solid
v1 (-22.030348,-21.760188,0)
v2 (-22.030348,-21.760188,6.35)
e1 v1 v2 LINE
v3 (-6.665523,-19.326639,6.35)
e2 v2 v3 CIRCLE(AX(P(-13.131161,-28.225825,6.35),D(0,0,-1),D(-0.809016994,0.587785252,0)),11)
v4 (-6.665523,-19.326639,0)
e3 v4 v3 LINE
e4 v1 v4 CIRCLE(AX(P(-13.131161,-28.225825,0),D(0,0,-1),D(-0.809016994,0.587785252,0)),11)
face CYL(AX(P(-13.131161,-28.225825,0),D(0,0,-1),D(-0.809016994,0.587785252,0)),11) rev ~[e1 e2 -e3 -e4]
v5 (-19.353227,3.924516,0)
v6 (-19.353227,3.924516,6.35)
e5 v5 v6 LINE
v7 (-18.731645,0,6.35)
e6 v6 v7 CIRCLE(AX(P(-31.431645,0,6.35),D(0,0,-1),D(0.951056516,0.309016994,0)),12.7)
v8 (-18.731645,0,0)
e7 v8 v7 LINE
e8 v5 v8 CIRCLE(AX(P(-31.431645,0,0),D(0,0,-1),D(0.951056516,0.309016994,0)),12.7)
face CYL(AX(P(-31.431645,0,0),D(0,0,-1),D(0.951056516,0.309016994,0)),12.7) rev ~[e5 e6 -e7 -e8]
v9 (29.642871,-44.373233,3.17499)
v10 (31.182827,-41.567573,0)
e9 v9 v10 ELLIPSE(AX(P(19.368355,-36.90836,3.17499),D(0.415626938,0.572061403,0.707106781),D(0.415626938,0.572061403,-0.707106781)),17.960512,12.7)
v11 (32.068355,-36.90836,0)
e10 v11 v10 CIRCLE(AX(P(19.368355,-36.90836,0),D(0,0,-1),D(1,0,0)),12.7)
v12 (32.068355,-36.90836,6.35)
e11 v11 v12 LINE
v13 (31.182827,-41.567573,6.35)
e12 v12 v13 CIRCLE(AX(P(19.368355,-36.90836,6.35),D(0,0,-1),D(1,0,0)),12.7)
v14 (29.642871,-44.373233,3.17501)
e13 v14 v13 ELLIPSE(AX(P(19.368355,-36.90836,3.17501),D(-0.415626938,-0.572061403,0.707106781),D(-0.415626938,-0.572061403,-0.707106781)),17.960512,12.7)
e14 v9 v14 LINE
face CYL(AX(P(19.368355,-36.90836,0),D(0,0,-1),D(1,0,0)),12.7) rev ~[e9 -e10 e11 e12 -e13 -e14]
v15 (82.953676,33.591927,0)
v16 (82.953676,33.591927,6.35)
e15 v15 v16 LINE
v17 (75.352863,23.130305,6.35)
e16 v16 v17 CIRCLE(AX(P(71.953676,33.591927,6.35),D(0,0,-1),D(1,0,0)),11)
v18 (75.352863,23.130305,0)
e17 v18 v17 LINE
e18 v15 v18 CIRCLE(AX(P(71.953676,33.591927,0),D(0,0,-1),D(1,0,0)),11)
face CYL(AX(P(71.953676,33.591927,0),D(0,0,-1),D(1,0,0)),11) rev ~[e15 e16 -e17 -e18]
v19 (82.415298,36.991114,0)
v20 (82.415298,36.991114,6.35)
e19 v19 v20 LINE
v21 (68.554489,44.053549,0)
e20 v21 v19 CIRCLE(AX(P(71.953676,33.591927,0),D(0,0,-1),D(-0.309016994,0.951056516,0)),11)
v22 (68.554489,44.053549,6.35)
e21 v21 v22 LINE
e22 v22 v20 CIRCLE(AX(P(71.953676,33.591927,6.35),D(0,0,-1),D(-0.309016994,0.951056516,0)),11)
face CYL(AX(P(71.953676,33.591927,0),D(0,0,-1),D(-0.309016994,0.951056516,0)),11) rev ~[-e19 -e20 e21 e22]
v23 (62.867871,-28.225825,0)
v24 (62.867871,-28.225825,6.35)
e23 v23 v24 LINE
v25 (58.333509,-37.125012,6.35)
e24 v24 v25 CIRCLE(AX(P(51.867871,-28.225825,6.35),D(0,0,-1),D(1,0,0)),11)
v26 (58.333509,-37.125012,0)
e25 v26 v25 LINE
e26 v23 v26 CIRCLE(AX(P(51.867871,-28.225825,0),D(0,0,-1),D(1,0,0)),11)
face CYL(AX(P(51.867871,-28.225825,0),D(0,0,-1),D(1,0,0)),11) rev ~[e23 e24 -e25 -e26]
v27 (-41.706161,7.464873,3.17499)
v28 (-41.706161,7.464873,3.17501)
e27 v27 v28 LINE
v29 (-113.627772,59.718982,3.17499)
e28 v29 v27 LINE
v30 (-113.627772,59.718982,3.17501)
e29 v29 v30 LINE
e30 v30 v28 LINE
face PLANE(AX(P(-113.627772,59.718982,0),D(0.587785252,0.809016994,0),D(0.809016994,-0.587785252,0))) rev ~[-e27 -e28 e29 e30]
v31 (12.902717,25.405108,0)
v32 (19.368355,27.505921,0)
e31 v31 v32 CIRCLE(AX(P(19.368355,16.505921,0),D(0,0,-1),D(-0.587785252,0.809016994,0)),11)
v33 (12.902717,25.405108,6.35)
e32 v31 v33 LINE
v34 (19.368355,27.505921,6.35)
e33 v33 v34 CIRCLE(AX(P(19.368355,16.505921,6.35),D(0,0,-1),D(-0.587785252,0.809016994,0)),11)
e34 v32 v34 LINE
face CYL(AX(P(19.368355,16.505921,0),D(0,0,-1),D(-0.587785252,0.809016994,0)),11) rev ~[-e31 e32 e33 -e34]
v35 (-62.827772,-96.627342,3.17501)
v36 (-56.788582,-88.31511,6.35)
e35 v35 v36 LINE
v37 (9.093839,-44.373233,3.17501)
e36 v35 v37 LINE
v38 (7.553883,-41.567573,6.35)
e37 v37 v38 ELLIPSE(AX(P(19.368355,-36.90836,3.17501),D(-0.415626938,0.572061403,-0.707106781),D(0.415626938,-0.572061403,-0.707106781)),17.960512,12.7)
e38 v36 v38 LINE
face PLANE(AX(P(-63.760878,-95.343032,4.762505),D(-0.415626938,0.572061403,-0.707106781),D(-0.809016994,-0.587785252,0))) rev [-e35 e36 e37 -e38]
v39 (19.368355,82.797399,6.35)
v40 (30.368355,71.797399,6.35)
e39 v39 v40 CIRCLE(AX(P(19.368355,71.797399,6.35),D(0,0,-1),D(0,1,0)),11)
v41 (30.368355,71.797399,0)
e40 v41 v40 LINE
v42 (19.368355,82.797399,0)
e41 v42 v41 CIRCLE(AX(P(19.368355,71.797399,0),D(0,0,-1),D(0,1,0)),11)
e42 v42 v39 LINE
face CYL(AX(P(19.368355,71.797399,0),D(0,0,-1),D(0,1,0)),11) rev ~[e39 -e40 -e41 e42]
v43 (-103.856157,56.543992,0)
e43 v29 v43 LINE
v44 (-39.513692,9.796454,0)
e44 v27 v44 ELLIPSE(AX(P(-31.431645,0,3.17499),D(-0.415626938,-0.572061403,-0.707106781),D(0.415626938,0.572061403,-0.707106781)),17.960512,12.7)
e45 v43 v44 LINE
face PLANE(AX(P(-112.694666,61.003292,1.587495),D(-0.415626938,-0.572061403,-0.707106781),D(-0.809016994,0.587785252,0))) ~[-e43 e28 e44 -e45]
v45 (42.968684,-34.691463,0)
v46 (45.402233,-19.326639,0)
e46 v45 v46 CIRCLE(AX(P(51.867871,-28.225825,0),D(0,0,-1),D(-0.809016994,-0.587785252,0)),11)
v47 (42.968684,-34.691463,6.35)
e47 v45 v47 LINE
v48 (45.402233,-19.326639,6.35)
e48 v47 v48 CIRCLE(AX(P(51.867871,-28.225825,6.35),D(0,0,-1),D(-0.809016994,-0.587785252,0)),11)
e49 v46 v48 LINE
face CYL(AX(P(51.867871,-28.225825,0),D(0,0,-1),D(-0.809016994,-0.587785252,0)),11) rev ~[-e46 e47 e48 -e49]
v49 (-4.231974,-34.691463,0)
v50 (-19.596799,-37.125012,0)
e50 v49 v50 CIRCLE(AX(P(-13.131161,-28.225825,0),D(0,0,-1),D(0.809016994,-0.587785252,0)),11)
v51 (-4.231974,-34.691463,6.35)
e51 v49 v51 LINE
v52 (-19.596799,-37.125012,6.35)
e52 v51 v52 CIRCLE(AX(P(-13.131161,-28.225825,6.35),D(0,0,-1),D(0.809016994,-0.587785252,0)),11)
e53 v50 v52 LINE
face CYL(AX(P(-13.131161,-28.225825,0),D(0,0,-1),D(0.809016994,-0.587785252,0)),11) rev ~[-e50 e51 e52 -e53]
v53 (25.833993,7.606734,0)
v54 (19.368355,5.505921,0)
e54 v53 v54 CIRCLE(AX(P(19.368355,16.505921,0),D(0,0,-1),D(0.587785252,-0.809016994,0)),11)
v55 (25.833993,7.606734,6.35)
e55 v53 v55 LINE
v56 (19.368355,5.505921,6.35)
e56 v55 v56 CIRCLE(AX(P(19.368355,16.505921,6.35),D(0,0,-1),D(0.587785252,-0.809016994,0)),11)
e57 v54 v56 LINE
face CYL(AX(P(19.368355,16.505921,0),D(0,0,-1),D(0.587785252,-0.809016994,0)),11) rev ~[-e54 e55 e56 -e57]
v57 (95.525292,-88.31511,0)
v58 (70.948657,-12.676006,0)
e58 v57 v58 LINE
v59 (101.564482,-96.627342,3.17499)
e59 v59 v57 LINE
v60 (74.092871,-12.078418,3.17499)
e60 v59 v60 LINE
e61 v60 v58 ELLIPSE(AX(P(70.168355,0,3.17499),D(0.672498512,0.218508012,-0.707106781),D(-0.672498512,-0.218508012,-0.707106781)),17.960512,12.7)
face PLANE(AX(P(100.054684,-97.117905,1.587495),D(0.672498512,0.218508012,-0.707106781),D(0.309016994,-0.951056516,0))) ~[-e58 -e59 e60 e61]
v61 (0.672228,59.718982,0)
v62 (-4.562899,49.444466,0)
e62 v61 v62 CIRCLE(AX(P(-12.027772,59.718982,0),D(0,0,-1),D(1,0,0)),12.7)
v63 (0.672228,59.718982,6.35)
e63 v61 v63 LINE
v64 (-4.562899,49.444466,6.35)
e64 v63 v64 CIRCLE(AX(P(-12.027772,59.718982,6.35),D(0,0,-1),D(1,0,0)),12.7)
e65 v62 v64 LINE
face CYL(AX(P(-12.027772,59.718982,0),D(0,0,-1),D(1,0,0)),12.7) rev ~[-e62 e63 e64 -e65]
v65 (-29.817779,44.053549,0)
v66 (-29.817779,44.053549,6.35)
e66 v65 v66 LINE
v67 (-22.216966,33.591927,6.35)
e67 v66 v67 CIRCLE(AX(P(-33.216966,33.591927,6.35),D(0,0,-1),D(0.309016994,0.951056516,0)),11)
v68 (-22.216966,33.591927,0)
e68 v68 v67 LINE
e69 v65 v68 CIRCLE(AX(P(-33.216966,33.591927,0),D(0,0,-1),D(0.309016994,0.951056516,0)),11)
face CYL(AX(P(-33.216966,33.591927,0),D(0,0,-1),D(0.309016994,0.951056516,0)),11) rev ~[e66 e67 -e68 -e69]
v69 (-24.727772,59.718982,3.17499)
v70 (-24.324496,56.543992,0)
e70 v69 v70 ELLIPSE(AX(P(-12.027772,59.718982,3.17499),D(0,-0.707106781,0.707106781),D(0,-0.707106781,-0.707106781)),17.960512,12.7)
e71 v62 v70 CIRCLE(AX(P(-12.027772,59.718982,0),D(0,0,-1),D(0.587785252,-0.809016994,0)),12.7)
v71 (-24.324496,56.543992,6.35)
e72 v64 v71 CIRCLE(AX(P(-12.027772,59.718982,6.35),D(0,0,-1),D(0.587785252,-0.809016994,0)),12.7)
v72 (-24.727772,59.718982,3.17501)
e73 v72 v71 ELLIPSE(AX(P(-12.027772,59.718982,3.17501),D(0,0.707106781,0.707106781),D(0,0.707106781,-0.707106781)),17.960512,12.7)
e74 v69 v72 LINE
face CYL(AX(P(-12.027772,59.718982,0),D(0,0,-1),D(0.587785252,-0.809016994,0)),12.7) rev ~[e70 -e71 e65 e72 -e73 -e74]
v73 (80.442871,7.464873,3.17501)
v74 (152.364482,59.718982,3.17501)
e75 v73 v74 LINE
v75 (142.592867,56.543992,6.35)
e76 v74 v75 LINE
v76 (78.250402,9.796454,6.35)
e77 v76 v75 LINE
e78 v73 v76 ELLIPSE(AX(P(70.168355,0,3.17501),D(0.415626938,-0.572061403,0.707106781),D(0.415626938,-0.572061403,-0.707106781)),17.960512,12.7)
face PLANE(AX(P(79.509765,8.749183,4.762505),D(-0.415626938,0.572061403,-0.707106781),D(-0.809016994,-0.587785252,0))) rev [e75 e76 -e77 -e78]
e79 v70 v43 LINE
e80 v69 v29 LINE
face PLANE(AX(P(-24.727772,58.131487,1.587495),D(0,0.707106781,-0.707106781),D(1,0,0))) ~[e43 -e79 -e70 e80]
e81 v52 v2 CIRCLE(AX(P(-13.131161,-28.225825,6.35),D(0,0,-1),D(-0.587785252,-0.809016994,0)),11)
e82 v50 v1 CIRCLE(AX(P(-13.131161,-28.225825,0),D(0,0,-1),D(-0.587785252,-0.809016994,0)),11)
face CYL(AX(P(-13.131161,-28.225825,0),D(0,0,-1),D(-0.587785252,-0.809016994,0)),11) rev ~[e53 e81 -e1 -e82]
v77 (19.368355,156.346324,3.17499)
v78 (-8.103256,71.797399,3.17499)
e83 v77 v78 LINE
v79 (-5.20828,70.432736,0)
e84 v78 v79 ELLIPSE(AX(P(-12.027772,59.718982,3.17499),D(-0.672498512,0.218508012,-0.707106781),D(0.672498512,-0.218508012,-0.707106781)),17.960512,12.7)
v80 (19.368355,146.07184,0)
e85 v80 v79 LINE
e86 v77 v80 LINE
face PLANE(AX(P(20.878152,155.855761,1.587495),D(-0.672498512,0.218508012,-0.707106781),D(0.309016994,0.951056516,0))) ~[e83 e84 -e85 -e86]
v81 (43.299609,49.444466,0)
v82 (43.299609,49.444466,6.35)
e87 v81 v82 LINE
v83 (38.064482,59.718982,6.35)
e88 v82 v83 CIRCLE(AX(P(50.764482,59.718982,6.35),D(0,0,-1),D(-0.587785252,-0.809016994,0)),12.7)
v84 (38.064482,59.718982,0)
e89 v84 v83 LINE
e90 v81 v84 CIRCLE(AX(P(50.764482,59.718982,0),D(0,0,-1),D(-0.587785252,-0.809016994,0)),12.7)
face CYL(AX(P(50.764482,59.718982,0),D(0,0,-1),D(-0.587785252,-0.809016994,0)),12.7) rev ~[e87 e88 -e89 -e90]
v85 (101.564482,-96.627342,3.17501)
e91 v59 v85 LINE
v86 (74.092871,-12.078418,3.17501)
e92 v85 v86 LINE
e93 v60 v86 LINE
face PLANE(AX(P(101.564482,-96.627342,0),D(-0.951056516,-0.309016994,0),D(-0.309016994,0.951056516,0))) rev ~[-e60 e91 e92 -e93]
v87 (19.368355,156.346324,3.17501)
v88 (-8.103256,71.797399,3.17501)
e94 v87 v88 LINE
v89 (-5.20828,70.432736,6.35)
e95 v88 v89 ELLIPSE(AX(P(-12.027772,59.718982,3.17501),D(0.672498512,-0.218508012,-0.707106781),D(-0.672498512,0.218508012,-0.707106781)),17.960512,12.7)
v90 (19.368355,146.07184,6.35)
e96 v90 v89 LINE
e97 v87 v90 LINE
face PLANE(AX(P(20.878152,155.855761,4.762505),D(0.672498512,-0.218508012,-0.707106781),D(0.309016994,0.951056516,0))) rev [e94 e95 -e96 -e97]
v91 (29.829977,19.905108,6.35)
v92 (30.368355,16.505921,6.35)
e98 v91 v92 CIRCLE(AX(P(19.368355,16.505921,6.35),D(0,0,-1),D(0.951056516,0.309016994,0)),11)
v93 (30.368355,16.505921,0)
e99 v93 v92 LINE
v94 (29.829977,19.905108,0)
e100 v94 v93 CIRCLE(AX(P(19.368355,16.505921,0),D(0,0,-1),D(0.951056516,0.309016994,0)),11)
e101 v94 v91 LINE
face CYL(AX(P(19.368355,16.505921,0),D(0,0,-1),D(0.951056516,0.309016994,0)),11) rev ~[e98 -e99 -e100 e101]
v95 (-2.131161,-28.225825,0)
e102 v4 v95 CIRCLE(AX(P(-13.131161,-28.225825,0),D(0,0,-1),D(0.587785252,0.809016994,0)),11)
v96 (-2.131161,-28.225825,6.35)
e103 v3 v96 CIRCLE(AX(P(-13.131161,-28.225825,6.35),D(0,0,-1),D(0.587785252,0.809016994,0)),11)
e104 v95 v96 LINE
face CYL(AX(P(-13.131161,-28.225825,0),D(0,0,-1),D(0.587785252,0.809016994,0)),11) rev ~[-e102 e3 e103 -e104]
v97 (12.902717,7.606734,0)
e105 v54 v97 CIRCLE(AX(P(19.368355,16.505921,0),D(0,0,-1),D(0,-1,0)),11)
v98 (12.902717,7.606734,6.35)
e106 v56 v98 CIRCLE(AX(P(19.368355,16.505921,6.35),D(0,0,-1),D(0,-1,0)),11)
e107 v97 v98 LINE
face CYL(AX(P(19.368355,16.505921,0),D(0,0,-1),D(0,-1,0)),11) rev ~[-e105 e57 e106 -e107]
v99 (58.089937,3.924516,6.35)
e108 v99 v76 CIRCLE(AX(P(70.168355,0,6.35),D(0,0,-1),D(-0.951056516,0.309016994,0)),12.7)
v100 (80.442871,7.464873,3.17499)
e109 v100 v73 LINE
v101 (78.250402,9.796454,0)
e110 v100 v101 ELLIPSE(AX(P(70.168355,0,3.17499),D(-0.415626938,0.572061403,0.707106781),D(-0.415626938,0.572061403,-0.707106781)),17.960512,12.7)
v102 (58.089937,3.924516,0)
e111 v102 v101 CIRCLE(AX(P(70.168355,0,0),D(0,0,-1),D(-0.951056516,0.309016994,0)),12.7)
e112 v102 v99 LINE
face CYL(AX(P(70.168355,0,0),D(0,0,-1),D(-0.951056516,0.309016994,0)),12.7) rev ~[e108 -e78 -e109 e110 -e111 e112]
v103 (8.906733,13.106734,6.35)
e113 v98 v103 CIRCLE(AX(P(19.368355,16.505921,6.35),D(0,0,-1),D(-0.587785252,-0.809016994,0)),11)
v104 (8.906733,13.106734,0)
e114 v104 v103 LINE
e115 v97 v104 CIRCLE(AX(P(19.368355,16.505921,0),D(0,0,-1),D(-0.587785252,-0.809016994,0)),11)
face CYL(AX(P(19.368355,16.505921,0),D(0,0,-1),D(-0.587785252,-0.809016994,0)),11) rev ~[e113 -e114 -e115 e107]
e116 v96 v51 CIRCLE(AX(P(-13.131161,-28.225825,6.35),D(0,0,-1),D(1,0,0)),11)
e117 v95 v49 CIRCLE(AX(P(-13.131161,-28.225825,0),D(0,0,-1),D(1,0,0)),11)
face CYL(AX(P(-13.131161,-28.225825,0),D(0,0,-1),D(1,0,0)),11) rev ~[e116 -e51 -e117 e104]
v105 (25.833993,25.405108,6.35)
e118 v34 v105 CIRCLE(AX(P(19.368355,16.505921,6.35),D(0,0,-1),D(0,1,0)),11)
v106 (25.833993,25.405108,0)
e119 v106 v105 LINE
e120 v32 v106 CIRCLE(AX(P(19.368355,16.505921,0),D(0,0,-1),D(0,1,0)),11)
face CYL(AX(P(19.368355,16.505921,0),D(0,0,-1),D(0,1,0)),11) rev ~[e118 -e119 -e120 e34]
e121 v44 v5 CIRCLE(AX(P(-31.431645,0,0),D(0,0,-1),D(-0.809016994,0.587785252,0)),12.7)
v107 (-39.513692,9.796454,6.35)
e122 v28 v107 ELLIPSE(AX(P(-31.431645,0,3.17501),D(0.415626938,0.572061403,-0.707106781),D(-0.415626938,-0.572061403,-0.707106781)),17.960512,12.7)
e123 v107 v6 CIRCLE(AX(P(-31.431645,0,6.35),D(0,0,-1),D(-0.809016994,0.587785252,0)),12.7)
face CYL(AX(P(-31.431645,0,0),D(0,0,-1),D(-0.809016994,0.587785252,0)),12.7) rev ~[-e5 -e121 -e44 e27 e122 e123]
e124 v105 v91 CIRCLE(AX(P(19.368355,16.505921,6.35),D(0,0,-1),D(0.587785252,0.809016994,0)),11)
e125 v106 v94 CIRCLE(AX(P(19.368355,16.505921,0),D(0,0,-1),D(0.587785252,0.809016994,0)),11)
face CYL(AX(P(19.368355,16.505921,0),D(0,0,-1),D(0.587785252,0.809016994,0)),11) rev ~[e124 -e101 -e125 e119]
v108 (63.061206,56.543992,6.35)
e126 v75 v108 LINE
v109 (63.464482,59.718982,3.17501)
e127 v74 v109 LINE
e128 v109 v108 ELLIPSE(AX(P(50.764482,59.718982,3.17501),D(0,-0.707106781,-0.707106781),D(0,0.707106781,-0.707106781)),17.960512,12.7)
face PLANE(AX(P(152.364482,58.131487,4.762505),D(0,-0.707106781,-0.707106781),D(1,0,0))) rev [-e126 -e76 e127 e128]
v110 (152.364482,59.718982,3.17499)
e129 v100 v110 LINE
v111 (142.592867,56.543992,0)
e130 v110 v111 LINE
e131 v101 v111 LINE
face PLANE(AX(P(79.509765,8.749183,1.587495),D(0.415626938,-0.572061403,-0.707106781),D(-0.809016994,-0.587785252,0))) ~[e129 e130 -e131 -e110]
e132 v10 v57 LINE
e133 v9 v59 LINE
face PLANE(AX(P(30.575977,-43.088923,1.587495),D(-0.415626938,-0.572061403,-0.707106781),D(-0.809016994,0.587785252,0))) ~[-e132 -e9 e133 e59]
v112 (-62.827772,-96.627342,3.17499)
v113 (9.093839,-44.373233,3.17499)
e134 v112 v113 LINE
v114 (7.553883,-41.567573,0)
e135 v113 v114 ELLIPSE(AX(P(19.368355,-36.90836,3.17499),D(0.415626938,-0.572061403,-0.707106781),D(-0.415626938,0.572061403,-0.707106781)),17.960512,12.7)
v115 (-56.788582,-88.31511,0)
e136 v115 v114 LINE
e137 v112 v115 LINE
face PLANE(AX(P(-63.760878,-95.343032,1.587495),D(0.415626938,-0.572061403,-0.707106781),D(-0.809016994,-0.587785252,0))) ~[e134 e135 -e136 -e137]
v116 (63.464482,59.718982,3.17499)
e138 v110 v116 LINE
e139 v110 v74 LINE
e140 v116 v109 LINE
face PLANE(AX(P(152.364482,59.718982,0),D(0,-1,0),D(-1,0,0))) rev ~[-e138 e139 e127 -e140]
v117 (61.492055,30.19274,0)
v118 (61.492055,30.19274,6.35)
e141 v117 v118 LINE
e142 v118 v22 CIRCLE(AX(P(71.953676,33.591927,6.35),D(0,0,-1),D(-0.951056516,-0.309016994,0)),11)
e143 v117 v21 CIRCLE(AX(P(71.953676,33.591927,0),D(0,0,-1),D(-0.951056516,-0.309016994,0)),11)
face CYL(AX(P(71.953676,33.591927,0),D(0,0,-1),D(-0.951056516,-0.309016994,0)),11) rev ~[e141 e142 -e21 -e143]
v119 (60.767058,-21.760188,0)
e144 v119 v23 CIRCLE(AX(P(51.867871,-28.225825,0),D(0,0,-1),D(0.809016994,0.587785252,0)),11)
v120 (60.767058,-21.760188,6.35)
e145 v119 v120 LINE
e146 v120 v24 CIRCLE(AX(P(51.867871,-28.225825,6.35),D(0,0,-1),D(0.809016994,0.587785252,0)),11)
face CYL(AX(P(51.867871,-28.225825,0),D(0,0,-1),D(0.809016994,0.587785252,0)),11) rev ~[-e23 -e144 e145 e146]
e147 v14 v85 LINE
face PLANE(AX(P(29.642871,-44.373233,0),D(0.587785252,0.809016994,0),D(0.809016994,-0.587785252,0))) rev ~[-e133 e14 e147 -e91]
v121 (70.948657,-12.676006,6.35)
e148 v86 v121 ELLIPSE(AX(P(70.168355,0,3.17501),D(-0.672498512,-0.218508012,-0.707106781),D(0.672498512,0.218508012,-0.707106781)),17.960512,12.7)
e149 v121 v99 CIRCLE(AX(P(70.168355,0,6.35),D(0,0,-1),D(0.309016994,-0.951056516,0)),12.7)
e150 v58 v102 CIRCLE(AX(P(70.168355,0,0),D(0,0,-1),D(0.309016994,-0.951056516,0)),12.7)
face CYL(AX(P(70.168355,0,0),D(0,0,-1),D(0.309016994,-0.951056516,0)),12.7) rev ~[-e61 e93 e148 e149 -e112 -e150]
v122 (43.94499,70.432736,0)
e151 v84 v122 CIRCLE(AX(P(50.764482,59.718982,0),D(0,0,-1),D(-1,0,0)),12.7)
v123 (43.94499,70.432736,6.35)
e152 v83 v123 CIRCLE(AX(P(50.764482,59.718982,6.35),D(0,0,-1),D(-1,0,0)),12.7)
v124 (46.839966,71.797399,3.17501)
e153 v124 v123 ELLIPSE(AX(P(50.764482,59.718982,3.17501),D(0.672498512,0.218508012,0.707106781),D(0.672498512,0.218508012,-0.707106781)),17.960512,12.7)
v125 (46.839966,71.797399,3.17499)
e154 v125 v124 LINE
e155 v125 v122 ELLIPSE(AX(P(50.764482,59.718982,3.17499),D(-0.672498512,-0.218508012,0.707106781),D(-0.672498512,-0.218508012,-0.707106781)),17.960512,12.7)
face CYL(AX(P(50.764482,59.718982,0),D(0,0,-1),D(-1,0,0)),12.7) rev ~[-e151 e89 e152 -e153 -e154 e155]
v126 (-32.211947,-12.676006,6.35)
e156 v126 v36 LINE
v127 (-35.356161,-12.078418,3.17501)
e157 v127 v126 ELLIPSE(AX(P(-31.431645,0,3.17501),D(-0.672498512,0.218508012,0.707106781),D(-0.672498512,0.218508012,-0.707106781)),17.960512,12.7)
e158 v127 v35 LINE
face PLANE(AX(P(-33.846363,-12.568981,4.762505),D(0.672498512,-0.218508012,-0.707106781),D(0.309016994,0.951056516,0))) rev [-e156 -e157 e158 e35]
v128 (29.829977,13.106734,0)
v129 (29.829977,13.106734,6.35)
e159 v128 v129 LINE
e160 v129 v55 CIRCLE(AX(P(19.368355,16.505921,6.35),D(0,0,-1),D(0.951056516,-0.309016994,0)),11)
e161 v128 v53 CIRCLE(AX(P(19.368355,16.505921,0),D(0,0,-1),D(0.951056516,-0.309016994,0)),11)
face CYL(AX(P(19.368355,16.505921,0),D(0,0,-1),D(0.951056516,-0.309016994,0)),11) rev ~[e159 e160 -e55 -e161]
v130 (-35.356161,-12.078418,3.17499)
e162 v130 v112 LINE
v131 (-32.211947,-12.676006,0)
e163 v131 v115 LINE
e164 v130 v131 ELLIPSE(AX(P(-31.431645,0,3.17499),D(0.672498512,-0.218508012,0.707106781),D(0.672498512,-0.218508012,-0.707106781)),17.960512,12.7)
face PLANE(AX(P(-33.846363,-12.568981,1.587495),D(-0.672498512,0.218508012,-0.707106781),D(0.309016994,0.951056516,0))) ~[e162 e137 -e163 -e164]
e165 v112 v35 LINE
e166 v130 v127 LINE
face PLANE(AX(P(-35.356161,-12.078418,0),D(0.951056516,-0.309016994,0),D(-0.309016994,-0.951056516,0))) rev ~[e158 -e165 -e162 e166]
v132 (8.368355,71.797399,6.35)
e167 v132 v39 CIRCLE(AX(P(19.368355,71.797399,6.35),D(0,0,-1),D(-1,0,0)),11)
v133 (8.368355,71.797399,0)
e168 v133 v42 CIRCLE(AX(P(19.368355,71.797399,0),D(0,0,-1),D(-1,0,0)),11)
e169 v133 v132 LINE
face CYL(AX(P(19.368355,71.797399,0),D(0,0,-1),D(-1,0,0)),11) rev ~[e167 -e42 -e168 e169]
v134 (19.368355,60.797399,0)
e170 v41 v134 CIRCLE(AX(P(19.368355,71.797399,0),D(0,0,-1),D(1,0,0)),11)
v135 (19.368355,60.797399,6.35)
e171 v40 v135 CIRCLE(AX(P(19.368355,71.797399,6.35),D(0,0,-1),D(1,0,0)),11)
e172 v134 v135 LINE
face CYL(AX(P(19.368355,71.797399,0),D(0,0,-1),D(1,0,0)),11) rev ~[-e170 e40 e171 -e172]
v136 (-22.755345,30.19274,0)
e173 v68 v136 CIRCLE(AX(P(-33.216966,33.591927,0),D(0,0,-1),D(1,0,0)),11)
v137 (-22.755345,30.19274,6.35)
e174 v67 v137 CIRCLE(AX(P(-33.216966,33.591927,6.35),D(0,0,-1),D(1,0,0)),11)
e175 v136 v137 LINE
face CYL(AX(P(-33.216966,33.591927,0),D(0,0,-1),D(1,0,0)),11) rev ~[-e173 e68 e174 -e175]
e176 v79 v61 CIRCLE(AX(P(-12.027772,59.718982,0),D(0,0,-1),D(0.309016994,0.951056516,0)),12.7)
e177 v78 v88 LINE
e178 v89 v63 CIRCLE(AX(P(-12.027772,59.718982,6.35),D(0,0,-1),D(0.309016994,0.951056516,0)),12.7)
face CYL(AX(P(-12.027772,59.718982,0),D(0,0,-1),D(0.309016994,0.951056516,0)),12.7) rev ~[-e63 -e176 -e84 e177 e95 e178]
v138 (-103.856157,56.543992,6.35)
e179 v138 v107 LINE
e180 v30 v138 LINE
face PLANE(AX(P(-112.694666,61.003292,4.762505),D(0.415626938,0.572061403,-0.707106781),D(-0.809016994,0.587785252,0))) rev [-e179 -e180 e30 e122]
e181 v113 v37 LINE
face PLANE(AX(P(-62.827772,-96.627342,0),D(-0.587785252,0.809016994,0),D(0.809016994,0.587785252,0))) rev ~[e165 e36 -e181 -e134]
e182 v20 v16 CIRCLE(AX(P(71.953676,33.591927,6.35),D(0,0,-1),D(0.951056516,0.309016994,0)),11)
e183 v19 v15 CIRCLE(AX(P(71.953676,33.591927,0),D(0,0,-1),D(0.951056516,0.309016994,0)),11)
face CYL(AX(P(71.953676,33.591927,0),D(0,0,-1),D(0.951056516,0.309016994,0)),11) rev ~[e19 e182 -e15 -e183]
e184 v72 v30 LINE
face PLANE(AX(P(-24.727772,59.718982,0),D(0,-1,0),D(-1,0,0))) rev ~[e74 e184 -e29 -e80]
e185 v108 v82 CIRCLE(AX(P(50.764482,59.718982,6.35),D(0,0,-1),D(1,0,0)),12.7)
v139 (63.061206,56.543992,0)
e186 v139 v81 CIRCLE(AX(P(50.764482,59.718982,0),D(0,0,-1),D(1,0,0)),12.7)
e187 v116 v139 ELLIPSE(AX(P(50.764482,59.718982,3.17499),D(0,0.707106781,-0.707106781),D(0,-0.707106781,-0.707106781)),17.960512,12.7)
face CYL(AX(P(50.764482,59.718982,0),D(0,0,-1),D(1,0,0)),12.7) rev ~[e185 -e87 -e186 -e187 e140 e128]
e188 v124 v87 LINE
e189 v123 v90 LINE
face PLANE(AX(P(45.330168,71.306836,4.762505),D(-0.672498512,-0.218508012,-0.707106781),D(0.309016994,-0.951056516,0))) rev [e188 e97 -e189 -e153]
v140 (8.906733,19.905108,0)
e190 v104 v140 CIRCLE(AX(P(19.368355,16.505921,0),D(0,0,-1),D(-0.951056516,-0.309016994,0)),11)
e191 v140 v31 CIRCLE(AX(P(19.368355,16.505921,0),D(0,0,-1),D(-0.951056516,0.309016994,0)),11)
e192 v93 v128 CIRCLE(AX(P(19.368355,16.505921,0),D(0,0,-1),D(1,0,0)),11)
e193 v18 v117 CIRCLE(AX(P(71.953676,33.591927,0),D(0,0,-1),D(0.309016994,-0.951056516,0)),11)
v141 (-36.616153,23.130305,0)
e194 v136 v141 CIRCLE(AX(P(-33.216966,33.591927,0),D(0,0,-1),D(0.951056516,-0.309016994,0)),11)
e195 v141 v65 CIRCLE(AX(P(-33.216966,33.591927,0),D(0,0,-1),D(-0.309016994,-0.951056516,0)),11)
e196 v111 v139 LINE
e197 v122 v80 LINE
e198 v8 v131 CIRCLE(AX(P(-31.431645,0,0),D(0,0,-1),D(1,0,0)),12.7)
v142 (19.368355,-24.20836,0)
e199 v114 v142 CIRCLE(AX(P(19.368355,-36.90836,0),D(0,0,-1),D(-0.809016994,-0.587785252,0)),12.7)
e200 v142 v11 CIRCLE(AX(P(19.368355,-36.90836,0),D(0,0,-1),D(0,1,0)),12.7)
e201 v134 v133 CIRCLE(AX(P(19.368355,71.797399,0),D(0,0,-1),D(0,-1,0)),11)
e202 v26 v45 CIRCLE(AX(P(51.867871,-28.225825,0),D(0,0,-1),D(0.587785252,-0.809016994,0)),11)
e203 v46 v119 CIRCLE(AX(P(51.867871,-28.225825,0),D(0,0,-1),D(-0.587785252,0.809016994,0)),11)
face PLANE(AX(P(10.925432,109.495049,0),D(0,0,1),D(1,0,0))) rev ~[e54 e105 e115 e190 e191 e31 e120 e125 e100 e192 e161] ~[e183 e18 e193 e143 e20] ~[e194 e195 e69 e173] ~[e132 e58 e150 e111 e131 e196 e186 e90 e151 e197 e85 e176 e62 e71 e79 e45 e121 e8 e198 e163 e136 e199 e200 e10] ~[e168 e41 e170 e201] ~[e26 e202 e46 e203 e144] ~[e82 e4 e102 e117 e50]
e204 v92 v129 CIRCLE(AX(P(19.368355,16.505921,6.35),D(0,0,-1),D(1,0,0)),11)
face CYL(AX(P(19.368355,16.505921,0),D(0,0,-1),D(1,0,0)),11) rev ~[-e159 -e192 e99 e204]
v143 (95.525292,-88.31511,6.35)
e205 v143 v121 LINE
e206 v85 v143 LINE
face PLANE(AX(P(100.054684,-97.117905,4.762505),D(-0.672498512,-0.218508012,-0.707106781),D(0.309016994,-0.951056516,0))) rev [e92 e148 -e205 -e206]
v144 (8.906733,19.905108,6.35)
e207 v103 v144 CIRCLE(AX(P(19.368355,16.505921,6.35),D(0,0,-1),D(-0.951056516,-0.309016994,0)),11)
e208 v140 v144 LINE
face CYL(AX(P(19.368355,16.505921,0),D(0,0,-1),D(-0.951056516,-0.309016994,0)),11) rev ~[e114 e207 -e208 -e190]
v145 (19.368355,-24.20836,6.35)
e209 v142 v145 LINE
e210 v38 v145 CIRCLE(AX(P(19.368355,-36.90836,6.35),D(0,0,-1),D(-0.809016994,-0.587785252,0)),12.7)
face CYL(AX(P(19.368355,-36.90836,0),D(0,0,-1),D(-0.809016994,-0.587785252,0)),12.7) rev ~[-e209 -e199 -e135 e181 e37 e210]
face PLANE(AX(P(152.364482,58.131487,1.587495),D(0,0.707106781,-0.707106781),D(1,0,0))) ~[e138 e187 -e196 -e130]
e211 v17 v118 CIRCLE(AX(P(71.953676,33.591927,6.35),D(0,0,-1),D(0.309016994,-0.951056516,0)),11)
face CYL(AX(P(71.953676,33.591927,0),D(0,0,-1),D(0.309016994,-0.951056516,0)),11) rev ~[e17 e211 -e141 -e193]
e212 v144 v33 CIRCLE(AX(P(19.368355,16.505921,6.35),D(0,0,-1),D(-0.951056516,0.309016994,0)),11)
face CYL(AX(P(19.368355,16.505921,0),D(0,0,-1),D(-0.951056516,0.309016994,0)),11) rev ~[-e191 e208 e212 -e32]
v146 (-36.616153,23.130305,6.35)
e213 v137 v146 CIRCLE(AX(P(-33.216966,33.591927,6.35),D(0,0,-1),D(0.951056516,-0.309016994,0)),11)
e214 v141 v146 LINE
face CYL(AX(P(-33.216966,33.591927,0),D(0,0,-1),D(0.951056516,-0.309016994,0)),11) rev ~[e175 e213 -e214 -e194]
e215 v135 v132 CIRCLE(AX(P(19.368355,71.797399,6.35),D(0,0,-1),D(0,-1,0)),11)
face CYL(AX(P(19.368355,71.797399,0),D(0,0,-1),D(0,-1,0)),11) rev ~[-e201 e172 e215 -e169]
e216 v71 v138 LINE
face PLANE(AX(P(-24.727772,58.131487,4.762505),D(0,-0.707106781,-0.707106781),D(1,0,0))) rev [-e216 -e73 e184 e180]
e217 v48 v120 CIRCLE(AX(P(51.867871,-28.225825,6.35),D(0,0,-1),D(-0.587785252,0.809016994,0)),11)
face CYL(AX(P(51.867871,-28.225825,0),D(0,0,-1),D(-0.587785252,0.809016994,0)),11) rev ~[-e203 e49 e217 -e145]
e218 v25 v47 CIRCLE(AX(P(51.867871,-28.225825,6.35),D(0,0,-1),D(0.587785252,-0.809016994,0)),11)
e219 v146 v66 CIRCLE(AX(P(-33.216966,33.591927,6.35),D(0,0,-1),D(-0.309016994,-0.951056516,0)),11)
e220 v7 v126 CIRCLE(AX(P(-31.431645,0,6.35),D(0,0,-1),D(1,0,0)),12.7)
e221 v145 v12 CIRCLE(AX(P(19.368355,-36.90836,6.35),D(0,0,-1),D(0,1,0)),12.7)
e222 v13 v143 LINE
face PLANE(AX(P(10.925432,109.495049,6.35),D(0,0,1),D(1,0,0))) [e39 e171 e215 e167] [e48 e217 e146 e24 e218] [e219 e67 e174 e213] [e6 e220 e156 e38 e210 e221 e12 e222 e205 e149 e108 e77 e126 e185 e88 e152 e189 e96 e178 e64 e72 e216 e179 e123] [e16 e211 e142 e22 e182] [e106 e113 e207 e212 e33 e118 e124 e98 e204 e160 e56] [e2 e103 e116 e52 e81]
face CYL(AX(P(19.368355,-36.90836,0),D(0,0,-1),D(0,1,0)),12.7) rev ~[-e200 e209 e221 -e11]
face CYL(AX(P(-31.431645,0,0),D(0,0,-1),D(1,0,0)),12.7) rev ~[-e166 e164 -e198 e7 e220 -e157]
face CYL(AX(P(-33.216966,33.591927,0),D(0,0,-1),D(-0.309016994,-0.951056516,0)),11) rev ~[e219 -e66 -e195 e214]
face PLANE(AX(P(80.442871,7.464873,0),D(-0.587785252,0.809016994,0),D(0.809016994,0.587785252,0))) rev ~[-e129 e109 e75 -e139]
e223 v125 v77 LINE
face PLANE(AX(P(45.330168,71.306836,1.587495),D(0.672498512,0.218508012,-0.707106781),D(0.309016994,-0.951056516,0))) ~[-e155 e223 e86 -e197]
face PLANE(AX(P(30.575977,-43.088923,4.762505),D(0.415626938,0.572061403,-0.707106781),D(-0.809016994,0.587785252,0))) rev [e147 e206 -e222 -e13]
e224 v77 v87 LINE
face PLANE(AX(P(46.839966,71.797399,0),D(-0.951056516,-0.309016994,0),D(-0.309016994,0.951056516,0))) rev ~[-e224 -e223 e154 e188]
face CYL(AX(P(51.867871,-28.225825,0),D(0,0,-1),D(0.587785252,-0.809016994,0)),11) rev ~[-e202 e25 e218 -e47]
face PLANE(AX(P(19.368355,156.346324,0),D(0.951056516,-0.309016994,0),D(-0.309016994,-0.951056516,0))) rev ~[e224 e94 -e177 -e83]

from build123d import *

# Parameters (mm, degrees)
F1_DEPTH = 6.35
F2_SIZE  = 3.17499


# Not quite as in the source:
# - a fillet or chamfer is up to 0.001 mm smaller than in the source, because OpenCascade refuses the exact size
# - a feature names something its author has since deleted; it is built from what else it names


with BuildPart() as f1:
    # F0 (on Top) → F1 (new body)
    with BuildSketch(Plane.XY):
        with BuildLine():
            Line((19.3683549781, 156.3463236885), (-8.1032558219, 71.7973993899))
            Line((-8.1032558219, 71.7973993899), (8.3683549781, 71.7973993899))
            ThreePointArc((8.3683549781, 71.7973993899), (11.590180385, 79.5755739829), (19.3683549781, 82.7973993899))
            Line((19.3683549781, 82.7973993899), (19.3683549781, 156.3463236885))
        make_face()
        with BuildLine():
            Line((19.3683549781, 60.7973993899), (19.3683549781, 59.7189816329))
            Line((19.3683549781, 59.7189816329), (38.0644816066, 59.7189816329))
            ThreePointArc((38.0644816066, 59.7189816329), (40.489965778, 67.183854337), (46.839965778, 71.7973993899))
            Line((46.839965778, 71.7973993899), (30.3683549781, 71.7973993899))
            ThreePointArc((30.3683549781, 71.7973993899), (27.1465295711, 64.0192247968), (19.3683549781, 60.7973993899))
        make_face()
        with BuildLine():
            Line((19.3683549781, 59.7189816329), (0.6722283496, 59.7189816329))
            ThreePointArc((0.6722283496, 59.7189816329), (-0.7119887932, 53.9533022862), (-4.5628989463, 49.4444658044))
            Line((-4.5628989463, 49.4444658044), (12.9027172029, 25.4051075068))
            ThreePointArc((12.9027172029, 25.4051075068), (15.96916804, 26.9675422479), (19.3683549781, 27.5059205686))
            Line((19.3683549781, 27.5059205686), (19.3683549781, 59.7189816329))
        make_face()
        with BuildLine():
            ThreePointArc((-4.5628989463, 49.4444658044), (-17.7934509971, 48.4031987757), (-24.7277716504, 59.7189816329))
            Line((-24.7277716504, 59.7189816329), (-29.8177793123, 44.0535488478))
            ThreePointArc((-29.8177793123, 44.0535488478), (-24.3177793123, 40.0575649437), (-22.2169662504, 33.5919271685))
            ThreePointArc((-22.2169662504, 33.5919271685), (-22.3523945039, 31.8711480531), (-22.7553445712, 30.1927402304))
            Line((-22.7553445712, 30.1927402304), (8.9067332988, 19.9051075068))
            ThreePointArc((8.9067332988, 19.9051075068), (10.46916804, 22.9715583438), (12.9027172029, 25.4051075068))
            Line((12.9027172029, 25.4051075068), (-4.5628989463, 49.4444658044))
        make_face()
        with BuildLine():
            Line((-36.6161531886, 23.1303054893), (-41.7061608505, 7.4648727041))
            ThreePointArc((-41.7061608505, 7.4648727041), (-29.4449273159, 12.5436419256), (-19.353227265, 3.9245158286))
            Line((-19.353227265, 3.9245158286), (8.9067332988, 13.1067336305))
            ThreePointArc((8.9067332988, 13.1067336305), (8.3683549781, 16.5059205686), (8.9067332988, 19.9051075068))
            Line((8.9067332988, 19.9051075068), (-22.7553445712, 30.1927402304))
            ThreePointArc((-22.7553445712, 30.1927402304), (-28.2230707533, 23.7908554024), (-36.6161531886, 23.1303054893))
        make_face()
        with BuildLine():
            ThreePointArc((-18.7316450219, 0), (-23.9667723178, -10.2745158286), (-35.3561608505, -12.0784177569))
            Line((-35.3561608505, -12.0784177569), (-22.0303477886, -21.7601876667))
            ThreePointArc((-22.0303477886, -21.7601876667), (-14.8519399659, -17.3612536953), (-6.6655230753, -19.3266385037))
            Line((-6.6655230753, -19.3266385037), (12.9027172029, 7.6067336305))
            ThreePointArc((12.9027172029, 7.6067336305), (10.46916804, 10.0402827934), (8.9067332988, 13.1067336305))
            Line((8.9067332988, 13.1067336305), (-19.353227265, 3.9245158286))
            ThreePointArc((-19.353227265, 3.9245158286), (-18.8880030964, 1.986717706), (-18.7316450219, 0))
        make_face()
        with BuildLine():
            ThreePointArc((19.3683549781, 5.5059205686), (15.96916804, 6.0442988894), (12.9027172029, 7.6067336305))
            Line((12.9027172029, 7.6067336305), (-6.6655230753, -19.3266385037))
            ThreePointArc((-6.6655230753, -19.3266385037), (-3.3300890844, -23.2319299447), (-2.1311608505, -28.2258254419))
            ThreePointArc((-2.1311608505, -28.2258254419), (-2.6695391712, -31.62501238), (-4.2319739124, -34.6914632171))
            Line((-4.2319739124, -34.6914632171), (9.0938391495, -44.3732331268))
            ThreePointArc((9.0938391495, -44.3732331268), (8.0525721209, -31.142681076), (19.3683549781, -24.2083604227))
            Line((19.3683549781, -24.2083604227), (19.3683549781, 5.5059205686))
        make_face()
        with BuildLine():
            Line((45.4022330314, -19.3266385037), (25.8339927533, 7.6067336305))
            ThreePointArc((25.8339927533, 7.6067336305), (22.7675419162, 6.0442988894), (19.3683549781, 5.5059205686))
            Line((19.3683549781, 5.5059205686), (19.3683549781, -24.2083604227))
            ThreePointArc((19.3683549781, -24.2083604227), (28.3486110991, -27.9281043016), (32.0683549781, -36.9083604227))
            ThreePointArc((32.0683549781, -36.9083604227), (31.446772735, -40.8328762512), (29.6428708066, -44.3732331268))
            Line((29.6428708066, -44.3732331268), (42.9686838685, -34.6914632171))
            ThreePointArc((42.9686838685, -34.6914632171), (41.0032990601, -26.5050463264), (45.4022330314, -19.3266385037))
        make_face()
        with BuildLine():
            ThreePointArc((29.8299766573, 13.1067336305), (28.2675419162, 10.0402827934), (25.8339927533, 7.6067336305))
            Line((25.8339927533, 7.6067336305), (45.4022330314, -19.3266385037))
            ThreePointArc((45.4022330314, -19.3266385037), (53.5886499221, -17.3612536953), (60.7670577448, -21.7601876667))
            Line((60.7670577448, -21.7601876667), (74.0928708066, -12.0784177569))
            ThreePointArc((74.0928708066, -12.0784177569), (61.188098857, -8.9802561211), (58.0899372211, 3.9245158286))
            Line((58.0899372211, 3.9245158286), (29.8299766573, 13.1067336305))
        make_face()
        with BuildLine():
            Line((61.4920545274, 30.1927402304), (29.8299766573, 19.9051075068))
            ThreePointArc((29.8299766573, 19.9051075068), (30.2329267246, 18.2266996841), (30.3683549781, 16.5059205686))
            ThreePointArc((30.3683549781, 16.5059205686), (30.2329267246, 14.7851414532), (29.8299766573, 13.1067336305))
            Line((29.8299766573, 13.1067336305), (58.0899372211, 3.9245158286))
            ThreePointArc((58.0899372211, 3.9245158286), (68.1816372721, 12.5436419256), (80.4428708066, 7.4648727041))
            Line((80.4428708066, 7.4648727041), (75.3528631447, 23.1303054893))
            ThreePointArc((75.3528631447, 23.1303054893), (66.9597807095, 23.7908554024), (61.4920545274, 30.1927402304))
        make_face()
        with BuildLine():
            Line((68.5544892685, 44.0535488478), (63.4644816066, 59.7189816329))
            ThreePointArc((63.4644816066, 59.7189816329), (56.5301609533, 48.4031987757), (43.2996089025, 49.4444658044))
            Line((43.2996089025, 49.4444658044), (25.8339927533, 25.4051075068))
            ThreePointArc((25.8339927533, 25.4051075068), (28.2675419162, 22.9715583438), (29.8299766573, 19.9051075068))
            Line((29.8299766573, 19.9051075068), (61.4920545274, 30.1927402304))
            ThreePointArc((61.4920545274, 30.1927402304), (62.1526044405, 38.5858226656), (68.5544892685, 44.0535488478))
        make_face()
        with BuildLine():
            Line((8.3683549781, 71.7973993899), (-8.1032558219, 71.7973993899))
            ThreePointArc((-8.1032558219, 71.7973993899), (-1.7532558219, 67.183854337), (0.6722283496, 59.7189816329))
            Line((0.6722283496, 59.7189816329), (19.3683549781, 59.7189816329))
            Line((19.3683549781, 59.7189816329), (19.3683549781, 60.7973993899))
            ThreePointArc((19.3683549781, 60.7973993899), (11.590180385, 64.0192247968), (8.3683549781, 71.7973993899))
        make_face()
        with BuildLine():
            Line((46.839965778, 71.7973993899), (19.3683549781, 156.3463236885))
            Line((19.3683549781, 156.3463236885), (19.3683549781, 82.7973993899))
            ThreePointArc((19.3683549781, 82.7973993899), (27.1465295711, 79.5755739829), (30.3683549781, 71.7973993899))
            Line((30.3683549781, 71.7973993899), (46.839965778, 71.7973993899))
        make_face()
        with BuildLine():
            Line((38.0644816066, 59.7189816329), (19.3683549781, 59.7189816329))
            Line((19.3683549781, 59.7189816329), (19.3683549781, 27.5059205686))
            ThreePointArc((19.3683549781, 27.5059205686), (22.7675419162, 26.9675422479), (25.8339927533, 25.4051075068))
            Line((25.8339927533, 25.4051075068), (43.2996089025, 49.4444658044))
            ThreePointArc((43.2996089025, 49.4444658044), (39.4486987494, 53.9533022862), (38.0644816066, 59.7189816329))
        make_face()
        with BuildLine():
            Line((-29.8177793123, 44.0535488478), (-24.7277716504, 59.7189816329))
            Line((-24.7277716504, 59.7189816329), (-113.6277716504, 59.7189816329))
            Line((-113.6277716504, 59.7189816329), (-43.6785879297, 36.9911141066))
            ThreePointArc((-43.6785879297, 36.9911141066), (-38.2108617476, 43.3929989346), (-29.8177793123, 44.0535488478))
        make_face()
        with BuildLine():
            Line((-43.6785879297, 36.9911141066), (-113.6277716504, 59.7189816329))
            Line((-113.6277716504, 59.7189816329), (-41.7061608505, 7.4648727041))
            Line((-41.7061608505, 7.4648727041), (-36.6161531886, 23.1303054893))
            ThreePointArc((-36.6161531886, 23.1303054893), (-43.0180380165, 28.5980316714), (-43.6785879297, 36.9911141066))
        make_face()
        with BuildLine():
            Line((-22.0303477886, -21.7601876667), (-35.3561608505, -12.0784177569))
            Line((-35.3561608505, -12.0784177569), (-62.8277716504, -96.6273420556))
            Line((-62.8277716504, -96.6273420556), (-19.5967986257, -37.12501238))
            ThreePointArc((-19.5967986257, -37.12501238), (-23.995732597, -29.9466045573), (-22.0303477886, -21.7601876667))
        make_face()
        with BuildLine():
            Line((-19.5967986257, -37.12501238), (-62.8277716504, -96.6273420556))
            Line((-62.8277716504, -96.6273420556), (9.0938391495, -44.3732331268))
            Line((9.0938391495, -44.3732331268), (-4.2319739124, -34.6914632171))
            ThreePointArc((-4.2319739124, -34.6914632171), (-11.410381735, -39.0903971884), (-19.5967986257, -37.12501238))
        make_face()
        with BuildLine():
            ThreePointArc((58.3335085819, -37.12501238), (50.1470916912, -39.0903971884), (42.9686838685, -34.6914632171))
            Line((42.9686838685, -34.6914632171), (29.6428708066, -44.3732331268))
            Line((29.6428708066, -44.3732331268), (101.5644816066, -96.6273420556))
            Line((101.5644816066, -96.6273420556), (58.3335085819, -37.12501238))
        make_face()
        with BuildLine():
            Line((74.0928708066, -12.0784177569), (60.7670577448, -21.7601876667))
            ThreePointArc((60.7670577448, -21.7601876667), (62.3294924859, -24.8266385037), (62.8678708066, -28.2258254419))
            ThreePointArc((62.8678708066, -28.2258254419), (61.6689425727, -33.219720939), (58.3335085819, -37.12501238))
            Line((58.3335085819, -37.12501238), (101.5644816066, -96.6273420556))
            Line((101.5644816066, -96.6273420556), (74.0928708066, -12.0784177569))
        make_face()
        with BuildLine():
            Line((80.4428708066, 7.4648727041), (152.3644816066, 59.7189816329))
            Line((152.3644816066, 59.7189816329), (82.4152978859, 36.9911141066))
            ThreePointArc((82.4152978859, 36.9911141066), (82.8182479532, 35.312706284), (82.9536762066, 33.5919271685))
            ThreePointArc((82.9536762066, 33.5919271685), (80.8528631447, 27.1262893933), (75.3528631447, 23.1303054893))
            Line((75.3528631447, 23.1303054893), (80.4428708066, 7.4648727041))
        make_face()
        with BuildLine():
            Line((152.3644816066, 59.7189816329), (63.4644816066, 59.7189816329))
            Line((63.4644816066, 59.7189816329), (68.5544892685, 44.0535488478))
            ThreePointArc((68.5544892685, 44.0535488478), (76.9475717037, 43.3929989346), (82.4152978859, 36.9911141066))
            Line((82.4152978859, 36.9911141066), (152.3644816066, 59.7189816329))
        make_face()
    extrude(amount=F1_DEPTH)

    # F2 (size 3.175 in the source; OpenCascade refuses exactly that, so slightly less here)
    f2_edges = [f1.edges().sort_by_distance(p)[0] for p in [
        (-77.666966, 33.591927, 6.35),
        (-69.177772, 59.718982, 6.35),
        (5.63255, 114.071862, 6.35),
        (33.10416, 114.071862, 6.35),
        (107.914482, 59.718982, 6.35),
        (116.403676, 33.591927, 6.35),
        (87.828676, -54.35288, 6.35),
        (65.603676, -70.500288, 6.35),
        (-26.866966, -70.500288, 6.35),
        (-49.091966, -54.35288, 6.35),
        (-26.866966, -70.500288, 0),
        (-49.091966, -54.35288, 0),
        (65.603676, -70.500288, 0),
        (87.828676, -54.35288, 0),
        (116.403676, 33.591927, 0),
        (107.914482, 59.718982, 0),
        (33.10416, 114.071862, 0),
        (5.63255, 114.071862, 0),
        (-69.177772, 59.718982, 0),
        (-77.666966, 33.591927, 0),
    ]]
    chamfer(f2_edges, length=F2_SIZE)


solid = f1.part
